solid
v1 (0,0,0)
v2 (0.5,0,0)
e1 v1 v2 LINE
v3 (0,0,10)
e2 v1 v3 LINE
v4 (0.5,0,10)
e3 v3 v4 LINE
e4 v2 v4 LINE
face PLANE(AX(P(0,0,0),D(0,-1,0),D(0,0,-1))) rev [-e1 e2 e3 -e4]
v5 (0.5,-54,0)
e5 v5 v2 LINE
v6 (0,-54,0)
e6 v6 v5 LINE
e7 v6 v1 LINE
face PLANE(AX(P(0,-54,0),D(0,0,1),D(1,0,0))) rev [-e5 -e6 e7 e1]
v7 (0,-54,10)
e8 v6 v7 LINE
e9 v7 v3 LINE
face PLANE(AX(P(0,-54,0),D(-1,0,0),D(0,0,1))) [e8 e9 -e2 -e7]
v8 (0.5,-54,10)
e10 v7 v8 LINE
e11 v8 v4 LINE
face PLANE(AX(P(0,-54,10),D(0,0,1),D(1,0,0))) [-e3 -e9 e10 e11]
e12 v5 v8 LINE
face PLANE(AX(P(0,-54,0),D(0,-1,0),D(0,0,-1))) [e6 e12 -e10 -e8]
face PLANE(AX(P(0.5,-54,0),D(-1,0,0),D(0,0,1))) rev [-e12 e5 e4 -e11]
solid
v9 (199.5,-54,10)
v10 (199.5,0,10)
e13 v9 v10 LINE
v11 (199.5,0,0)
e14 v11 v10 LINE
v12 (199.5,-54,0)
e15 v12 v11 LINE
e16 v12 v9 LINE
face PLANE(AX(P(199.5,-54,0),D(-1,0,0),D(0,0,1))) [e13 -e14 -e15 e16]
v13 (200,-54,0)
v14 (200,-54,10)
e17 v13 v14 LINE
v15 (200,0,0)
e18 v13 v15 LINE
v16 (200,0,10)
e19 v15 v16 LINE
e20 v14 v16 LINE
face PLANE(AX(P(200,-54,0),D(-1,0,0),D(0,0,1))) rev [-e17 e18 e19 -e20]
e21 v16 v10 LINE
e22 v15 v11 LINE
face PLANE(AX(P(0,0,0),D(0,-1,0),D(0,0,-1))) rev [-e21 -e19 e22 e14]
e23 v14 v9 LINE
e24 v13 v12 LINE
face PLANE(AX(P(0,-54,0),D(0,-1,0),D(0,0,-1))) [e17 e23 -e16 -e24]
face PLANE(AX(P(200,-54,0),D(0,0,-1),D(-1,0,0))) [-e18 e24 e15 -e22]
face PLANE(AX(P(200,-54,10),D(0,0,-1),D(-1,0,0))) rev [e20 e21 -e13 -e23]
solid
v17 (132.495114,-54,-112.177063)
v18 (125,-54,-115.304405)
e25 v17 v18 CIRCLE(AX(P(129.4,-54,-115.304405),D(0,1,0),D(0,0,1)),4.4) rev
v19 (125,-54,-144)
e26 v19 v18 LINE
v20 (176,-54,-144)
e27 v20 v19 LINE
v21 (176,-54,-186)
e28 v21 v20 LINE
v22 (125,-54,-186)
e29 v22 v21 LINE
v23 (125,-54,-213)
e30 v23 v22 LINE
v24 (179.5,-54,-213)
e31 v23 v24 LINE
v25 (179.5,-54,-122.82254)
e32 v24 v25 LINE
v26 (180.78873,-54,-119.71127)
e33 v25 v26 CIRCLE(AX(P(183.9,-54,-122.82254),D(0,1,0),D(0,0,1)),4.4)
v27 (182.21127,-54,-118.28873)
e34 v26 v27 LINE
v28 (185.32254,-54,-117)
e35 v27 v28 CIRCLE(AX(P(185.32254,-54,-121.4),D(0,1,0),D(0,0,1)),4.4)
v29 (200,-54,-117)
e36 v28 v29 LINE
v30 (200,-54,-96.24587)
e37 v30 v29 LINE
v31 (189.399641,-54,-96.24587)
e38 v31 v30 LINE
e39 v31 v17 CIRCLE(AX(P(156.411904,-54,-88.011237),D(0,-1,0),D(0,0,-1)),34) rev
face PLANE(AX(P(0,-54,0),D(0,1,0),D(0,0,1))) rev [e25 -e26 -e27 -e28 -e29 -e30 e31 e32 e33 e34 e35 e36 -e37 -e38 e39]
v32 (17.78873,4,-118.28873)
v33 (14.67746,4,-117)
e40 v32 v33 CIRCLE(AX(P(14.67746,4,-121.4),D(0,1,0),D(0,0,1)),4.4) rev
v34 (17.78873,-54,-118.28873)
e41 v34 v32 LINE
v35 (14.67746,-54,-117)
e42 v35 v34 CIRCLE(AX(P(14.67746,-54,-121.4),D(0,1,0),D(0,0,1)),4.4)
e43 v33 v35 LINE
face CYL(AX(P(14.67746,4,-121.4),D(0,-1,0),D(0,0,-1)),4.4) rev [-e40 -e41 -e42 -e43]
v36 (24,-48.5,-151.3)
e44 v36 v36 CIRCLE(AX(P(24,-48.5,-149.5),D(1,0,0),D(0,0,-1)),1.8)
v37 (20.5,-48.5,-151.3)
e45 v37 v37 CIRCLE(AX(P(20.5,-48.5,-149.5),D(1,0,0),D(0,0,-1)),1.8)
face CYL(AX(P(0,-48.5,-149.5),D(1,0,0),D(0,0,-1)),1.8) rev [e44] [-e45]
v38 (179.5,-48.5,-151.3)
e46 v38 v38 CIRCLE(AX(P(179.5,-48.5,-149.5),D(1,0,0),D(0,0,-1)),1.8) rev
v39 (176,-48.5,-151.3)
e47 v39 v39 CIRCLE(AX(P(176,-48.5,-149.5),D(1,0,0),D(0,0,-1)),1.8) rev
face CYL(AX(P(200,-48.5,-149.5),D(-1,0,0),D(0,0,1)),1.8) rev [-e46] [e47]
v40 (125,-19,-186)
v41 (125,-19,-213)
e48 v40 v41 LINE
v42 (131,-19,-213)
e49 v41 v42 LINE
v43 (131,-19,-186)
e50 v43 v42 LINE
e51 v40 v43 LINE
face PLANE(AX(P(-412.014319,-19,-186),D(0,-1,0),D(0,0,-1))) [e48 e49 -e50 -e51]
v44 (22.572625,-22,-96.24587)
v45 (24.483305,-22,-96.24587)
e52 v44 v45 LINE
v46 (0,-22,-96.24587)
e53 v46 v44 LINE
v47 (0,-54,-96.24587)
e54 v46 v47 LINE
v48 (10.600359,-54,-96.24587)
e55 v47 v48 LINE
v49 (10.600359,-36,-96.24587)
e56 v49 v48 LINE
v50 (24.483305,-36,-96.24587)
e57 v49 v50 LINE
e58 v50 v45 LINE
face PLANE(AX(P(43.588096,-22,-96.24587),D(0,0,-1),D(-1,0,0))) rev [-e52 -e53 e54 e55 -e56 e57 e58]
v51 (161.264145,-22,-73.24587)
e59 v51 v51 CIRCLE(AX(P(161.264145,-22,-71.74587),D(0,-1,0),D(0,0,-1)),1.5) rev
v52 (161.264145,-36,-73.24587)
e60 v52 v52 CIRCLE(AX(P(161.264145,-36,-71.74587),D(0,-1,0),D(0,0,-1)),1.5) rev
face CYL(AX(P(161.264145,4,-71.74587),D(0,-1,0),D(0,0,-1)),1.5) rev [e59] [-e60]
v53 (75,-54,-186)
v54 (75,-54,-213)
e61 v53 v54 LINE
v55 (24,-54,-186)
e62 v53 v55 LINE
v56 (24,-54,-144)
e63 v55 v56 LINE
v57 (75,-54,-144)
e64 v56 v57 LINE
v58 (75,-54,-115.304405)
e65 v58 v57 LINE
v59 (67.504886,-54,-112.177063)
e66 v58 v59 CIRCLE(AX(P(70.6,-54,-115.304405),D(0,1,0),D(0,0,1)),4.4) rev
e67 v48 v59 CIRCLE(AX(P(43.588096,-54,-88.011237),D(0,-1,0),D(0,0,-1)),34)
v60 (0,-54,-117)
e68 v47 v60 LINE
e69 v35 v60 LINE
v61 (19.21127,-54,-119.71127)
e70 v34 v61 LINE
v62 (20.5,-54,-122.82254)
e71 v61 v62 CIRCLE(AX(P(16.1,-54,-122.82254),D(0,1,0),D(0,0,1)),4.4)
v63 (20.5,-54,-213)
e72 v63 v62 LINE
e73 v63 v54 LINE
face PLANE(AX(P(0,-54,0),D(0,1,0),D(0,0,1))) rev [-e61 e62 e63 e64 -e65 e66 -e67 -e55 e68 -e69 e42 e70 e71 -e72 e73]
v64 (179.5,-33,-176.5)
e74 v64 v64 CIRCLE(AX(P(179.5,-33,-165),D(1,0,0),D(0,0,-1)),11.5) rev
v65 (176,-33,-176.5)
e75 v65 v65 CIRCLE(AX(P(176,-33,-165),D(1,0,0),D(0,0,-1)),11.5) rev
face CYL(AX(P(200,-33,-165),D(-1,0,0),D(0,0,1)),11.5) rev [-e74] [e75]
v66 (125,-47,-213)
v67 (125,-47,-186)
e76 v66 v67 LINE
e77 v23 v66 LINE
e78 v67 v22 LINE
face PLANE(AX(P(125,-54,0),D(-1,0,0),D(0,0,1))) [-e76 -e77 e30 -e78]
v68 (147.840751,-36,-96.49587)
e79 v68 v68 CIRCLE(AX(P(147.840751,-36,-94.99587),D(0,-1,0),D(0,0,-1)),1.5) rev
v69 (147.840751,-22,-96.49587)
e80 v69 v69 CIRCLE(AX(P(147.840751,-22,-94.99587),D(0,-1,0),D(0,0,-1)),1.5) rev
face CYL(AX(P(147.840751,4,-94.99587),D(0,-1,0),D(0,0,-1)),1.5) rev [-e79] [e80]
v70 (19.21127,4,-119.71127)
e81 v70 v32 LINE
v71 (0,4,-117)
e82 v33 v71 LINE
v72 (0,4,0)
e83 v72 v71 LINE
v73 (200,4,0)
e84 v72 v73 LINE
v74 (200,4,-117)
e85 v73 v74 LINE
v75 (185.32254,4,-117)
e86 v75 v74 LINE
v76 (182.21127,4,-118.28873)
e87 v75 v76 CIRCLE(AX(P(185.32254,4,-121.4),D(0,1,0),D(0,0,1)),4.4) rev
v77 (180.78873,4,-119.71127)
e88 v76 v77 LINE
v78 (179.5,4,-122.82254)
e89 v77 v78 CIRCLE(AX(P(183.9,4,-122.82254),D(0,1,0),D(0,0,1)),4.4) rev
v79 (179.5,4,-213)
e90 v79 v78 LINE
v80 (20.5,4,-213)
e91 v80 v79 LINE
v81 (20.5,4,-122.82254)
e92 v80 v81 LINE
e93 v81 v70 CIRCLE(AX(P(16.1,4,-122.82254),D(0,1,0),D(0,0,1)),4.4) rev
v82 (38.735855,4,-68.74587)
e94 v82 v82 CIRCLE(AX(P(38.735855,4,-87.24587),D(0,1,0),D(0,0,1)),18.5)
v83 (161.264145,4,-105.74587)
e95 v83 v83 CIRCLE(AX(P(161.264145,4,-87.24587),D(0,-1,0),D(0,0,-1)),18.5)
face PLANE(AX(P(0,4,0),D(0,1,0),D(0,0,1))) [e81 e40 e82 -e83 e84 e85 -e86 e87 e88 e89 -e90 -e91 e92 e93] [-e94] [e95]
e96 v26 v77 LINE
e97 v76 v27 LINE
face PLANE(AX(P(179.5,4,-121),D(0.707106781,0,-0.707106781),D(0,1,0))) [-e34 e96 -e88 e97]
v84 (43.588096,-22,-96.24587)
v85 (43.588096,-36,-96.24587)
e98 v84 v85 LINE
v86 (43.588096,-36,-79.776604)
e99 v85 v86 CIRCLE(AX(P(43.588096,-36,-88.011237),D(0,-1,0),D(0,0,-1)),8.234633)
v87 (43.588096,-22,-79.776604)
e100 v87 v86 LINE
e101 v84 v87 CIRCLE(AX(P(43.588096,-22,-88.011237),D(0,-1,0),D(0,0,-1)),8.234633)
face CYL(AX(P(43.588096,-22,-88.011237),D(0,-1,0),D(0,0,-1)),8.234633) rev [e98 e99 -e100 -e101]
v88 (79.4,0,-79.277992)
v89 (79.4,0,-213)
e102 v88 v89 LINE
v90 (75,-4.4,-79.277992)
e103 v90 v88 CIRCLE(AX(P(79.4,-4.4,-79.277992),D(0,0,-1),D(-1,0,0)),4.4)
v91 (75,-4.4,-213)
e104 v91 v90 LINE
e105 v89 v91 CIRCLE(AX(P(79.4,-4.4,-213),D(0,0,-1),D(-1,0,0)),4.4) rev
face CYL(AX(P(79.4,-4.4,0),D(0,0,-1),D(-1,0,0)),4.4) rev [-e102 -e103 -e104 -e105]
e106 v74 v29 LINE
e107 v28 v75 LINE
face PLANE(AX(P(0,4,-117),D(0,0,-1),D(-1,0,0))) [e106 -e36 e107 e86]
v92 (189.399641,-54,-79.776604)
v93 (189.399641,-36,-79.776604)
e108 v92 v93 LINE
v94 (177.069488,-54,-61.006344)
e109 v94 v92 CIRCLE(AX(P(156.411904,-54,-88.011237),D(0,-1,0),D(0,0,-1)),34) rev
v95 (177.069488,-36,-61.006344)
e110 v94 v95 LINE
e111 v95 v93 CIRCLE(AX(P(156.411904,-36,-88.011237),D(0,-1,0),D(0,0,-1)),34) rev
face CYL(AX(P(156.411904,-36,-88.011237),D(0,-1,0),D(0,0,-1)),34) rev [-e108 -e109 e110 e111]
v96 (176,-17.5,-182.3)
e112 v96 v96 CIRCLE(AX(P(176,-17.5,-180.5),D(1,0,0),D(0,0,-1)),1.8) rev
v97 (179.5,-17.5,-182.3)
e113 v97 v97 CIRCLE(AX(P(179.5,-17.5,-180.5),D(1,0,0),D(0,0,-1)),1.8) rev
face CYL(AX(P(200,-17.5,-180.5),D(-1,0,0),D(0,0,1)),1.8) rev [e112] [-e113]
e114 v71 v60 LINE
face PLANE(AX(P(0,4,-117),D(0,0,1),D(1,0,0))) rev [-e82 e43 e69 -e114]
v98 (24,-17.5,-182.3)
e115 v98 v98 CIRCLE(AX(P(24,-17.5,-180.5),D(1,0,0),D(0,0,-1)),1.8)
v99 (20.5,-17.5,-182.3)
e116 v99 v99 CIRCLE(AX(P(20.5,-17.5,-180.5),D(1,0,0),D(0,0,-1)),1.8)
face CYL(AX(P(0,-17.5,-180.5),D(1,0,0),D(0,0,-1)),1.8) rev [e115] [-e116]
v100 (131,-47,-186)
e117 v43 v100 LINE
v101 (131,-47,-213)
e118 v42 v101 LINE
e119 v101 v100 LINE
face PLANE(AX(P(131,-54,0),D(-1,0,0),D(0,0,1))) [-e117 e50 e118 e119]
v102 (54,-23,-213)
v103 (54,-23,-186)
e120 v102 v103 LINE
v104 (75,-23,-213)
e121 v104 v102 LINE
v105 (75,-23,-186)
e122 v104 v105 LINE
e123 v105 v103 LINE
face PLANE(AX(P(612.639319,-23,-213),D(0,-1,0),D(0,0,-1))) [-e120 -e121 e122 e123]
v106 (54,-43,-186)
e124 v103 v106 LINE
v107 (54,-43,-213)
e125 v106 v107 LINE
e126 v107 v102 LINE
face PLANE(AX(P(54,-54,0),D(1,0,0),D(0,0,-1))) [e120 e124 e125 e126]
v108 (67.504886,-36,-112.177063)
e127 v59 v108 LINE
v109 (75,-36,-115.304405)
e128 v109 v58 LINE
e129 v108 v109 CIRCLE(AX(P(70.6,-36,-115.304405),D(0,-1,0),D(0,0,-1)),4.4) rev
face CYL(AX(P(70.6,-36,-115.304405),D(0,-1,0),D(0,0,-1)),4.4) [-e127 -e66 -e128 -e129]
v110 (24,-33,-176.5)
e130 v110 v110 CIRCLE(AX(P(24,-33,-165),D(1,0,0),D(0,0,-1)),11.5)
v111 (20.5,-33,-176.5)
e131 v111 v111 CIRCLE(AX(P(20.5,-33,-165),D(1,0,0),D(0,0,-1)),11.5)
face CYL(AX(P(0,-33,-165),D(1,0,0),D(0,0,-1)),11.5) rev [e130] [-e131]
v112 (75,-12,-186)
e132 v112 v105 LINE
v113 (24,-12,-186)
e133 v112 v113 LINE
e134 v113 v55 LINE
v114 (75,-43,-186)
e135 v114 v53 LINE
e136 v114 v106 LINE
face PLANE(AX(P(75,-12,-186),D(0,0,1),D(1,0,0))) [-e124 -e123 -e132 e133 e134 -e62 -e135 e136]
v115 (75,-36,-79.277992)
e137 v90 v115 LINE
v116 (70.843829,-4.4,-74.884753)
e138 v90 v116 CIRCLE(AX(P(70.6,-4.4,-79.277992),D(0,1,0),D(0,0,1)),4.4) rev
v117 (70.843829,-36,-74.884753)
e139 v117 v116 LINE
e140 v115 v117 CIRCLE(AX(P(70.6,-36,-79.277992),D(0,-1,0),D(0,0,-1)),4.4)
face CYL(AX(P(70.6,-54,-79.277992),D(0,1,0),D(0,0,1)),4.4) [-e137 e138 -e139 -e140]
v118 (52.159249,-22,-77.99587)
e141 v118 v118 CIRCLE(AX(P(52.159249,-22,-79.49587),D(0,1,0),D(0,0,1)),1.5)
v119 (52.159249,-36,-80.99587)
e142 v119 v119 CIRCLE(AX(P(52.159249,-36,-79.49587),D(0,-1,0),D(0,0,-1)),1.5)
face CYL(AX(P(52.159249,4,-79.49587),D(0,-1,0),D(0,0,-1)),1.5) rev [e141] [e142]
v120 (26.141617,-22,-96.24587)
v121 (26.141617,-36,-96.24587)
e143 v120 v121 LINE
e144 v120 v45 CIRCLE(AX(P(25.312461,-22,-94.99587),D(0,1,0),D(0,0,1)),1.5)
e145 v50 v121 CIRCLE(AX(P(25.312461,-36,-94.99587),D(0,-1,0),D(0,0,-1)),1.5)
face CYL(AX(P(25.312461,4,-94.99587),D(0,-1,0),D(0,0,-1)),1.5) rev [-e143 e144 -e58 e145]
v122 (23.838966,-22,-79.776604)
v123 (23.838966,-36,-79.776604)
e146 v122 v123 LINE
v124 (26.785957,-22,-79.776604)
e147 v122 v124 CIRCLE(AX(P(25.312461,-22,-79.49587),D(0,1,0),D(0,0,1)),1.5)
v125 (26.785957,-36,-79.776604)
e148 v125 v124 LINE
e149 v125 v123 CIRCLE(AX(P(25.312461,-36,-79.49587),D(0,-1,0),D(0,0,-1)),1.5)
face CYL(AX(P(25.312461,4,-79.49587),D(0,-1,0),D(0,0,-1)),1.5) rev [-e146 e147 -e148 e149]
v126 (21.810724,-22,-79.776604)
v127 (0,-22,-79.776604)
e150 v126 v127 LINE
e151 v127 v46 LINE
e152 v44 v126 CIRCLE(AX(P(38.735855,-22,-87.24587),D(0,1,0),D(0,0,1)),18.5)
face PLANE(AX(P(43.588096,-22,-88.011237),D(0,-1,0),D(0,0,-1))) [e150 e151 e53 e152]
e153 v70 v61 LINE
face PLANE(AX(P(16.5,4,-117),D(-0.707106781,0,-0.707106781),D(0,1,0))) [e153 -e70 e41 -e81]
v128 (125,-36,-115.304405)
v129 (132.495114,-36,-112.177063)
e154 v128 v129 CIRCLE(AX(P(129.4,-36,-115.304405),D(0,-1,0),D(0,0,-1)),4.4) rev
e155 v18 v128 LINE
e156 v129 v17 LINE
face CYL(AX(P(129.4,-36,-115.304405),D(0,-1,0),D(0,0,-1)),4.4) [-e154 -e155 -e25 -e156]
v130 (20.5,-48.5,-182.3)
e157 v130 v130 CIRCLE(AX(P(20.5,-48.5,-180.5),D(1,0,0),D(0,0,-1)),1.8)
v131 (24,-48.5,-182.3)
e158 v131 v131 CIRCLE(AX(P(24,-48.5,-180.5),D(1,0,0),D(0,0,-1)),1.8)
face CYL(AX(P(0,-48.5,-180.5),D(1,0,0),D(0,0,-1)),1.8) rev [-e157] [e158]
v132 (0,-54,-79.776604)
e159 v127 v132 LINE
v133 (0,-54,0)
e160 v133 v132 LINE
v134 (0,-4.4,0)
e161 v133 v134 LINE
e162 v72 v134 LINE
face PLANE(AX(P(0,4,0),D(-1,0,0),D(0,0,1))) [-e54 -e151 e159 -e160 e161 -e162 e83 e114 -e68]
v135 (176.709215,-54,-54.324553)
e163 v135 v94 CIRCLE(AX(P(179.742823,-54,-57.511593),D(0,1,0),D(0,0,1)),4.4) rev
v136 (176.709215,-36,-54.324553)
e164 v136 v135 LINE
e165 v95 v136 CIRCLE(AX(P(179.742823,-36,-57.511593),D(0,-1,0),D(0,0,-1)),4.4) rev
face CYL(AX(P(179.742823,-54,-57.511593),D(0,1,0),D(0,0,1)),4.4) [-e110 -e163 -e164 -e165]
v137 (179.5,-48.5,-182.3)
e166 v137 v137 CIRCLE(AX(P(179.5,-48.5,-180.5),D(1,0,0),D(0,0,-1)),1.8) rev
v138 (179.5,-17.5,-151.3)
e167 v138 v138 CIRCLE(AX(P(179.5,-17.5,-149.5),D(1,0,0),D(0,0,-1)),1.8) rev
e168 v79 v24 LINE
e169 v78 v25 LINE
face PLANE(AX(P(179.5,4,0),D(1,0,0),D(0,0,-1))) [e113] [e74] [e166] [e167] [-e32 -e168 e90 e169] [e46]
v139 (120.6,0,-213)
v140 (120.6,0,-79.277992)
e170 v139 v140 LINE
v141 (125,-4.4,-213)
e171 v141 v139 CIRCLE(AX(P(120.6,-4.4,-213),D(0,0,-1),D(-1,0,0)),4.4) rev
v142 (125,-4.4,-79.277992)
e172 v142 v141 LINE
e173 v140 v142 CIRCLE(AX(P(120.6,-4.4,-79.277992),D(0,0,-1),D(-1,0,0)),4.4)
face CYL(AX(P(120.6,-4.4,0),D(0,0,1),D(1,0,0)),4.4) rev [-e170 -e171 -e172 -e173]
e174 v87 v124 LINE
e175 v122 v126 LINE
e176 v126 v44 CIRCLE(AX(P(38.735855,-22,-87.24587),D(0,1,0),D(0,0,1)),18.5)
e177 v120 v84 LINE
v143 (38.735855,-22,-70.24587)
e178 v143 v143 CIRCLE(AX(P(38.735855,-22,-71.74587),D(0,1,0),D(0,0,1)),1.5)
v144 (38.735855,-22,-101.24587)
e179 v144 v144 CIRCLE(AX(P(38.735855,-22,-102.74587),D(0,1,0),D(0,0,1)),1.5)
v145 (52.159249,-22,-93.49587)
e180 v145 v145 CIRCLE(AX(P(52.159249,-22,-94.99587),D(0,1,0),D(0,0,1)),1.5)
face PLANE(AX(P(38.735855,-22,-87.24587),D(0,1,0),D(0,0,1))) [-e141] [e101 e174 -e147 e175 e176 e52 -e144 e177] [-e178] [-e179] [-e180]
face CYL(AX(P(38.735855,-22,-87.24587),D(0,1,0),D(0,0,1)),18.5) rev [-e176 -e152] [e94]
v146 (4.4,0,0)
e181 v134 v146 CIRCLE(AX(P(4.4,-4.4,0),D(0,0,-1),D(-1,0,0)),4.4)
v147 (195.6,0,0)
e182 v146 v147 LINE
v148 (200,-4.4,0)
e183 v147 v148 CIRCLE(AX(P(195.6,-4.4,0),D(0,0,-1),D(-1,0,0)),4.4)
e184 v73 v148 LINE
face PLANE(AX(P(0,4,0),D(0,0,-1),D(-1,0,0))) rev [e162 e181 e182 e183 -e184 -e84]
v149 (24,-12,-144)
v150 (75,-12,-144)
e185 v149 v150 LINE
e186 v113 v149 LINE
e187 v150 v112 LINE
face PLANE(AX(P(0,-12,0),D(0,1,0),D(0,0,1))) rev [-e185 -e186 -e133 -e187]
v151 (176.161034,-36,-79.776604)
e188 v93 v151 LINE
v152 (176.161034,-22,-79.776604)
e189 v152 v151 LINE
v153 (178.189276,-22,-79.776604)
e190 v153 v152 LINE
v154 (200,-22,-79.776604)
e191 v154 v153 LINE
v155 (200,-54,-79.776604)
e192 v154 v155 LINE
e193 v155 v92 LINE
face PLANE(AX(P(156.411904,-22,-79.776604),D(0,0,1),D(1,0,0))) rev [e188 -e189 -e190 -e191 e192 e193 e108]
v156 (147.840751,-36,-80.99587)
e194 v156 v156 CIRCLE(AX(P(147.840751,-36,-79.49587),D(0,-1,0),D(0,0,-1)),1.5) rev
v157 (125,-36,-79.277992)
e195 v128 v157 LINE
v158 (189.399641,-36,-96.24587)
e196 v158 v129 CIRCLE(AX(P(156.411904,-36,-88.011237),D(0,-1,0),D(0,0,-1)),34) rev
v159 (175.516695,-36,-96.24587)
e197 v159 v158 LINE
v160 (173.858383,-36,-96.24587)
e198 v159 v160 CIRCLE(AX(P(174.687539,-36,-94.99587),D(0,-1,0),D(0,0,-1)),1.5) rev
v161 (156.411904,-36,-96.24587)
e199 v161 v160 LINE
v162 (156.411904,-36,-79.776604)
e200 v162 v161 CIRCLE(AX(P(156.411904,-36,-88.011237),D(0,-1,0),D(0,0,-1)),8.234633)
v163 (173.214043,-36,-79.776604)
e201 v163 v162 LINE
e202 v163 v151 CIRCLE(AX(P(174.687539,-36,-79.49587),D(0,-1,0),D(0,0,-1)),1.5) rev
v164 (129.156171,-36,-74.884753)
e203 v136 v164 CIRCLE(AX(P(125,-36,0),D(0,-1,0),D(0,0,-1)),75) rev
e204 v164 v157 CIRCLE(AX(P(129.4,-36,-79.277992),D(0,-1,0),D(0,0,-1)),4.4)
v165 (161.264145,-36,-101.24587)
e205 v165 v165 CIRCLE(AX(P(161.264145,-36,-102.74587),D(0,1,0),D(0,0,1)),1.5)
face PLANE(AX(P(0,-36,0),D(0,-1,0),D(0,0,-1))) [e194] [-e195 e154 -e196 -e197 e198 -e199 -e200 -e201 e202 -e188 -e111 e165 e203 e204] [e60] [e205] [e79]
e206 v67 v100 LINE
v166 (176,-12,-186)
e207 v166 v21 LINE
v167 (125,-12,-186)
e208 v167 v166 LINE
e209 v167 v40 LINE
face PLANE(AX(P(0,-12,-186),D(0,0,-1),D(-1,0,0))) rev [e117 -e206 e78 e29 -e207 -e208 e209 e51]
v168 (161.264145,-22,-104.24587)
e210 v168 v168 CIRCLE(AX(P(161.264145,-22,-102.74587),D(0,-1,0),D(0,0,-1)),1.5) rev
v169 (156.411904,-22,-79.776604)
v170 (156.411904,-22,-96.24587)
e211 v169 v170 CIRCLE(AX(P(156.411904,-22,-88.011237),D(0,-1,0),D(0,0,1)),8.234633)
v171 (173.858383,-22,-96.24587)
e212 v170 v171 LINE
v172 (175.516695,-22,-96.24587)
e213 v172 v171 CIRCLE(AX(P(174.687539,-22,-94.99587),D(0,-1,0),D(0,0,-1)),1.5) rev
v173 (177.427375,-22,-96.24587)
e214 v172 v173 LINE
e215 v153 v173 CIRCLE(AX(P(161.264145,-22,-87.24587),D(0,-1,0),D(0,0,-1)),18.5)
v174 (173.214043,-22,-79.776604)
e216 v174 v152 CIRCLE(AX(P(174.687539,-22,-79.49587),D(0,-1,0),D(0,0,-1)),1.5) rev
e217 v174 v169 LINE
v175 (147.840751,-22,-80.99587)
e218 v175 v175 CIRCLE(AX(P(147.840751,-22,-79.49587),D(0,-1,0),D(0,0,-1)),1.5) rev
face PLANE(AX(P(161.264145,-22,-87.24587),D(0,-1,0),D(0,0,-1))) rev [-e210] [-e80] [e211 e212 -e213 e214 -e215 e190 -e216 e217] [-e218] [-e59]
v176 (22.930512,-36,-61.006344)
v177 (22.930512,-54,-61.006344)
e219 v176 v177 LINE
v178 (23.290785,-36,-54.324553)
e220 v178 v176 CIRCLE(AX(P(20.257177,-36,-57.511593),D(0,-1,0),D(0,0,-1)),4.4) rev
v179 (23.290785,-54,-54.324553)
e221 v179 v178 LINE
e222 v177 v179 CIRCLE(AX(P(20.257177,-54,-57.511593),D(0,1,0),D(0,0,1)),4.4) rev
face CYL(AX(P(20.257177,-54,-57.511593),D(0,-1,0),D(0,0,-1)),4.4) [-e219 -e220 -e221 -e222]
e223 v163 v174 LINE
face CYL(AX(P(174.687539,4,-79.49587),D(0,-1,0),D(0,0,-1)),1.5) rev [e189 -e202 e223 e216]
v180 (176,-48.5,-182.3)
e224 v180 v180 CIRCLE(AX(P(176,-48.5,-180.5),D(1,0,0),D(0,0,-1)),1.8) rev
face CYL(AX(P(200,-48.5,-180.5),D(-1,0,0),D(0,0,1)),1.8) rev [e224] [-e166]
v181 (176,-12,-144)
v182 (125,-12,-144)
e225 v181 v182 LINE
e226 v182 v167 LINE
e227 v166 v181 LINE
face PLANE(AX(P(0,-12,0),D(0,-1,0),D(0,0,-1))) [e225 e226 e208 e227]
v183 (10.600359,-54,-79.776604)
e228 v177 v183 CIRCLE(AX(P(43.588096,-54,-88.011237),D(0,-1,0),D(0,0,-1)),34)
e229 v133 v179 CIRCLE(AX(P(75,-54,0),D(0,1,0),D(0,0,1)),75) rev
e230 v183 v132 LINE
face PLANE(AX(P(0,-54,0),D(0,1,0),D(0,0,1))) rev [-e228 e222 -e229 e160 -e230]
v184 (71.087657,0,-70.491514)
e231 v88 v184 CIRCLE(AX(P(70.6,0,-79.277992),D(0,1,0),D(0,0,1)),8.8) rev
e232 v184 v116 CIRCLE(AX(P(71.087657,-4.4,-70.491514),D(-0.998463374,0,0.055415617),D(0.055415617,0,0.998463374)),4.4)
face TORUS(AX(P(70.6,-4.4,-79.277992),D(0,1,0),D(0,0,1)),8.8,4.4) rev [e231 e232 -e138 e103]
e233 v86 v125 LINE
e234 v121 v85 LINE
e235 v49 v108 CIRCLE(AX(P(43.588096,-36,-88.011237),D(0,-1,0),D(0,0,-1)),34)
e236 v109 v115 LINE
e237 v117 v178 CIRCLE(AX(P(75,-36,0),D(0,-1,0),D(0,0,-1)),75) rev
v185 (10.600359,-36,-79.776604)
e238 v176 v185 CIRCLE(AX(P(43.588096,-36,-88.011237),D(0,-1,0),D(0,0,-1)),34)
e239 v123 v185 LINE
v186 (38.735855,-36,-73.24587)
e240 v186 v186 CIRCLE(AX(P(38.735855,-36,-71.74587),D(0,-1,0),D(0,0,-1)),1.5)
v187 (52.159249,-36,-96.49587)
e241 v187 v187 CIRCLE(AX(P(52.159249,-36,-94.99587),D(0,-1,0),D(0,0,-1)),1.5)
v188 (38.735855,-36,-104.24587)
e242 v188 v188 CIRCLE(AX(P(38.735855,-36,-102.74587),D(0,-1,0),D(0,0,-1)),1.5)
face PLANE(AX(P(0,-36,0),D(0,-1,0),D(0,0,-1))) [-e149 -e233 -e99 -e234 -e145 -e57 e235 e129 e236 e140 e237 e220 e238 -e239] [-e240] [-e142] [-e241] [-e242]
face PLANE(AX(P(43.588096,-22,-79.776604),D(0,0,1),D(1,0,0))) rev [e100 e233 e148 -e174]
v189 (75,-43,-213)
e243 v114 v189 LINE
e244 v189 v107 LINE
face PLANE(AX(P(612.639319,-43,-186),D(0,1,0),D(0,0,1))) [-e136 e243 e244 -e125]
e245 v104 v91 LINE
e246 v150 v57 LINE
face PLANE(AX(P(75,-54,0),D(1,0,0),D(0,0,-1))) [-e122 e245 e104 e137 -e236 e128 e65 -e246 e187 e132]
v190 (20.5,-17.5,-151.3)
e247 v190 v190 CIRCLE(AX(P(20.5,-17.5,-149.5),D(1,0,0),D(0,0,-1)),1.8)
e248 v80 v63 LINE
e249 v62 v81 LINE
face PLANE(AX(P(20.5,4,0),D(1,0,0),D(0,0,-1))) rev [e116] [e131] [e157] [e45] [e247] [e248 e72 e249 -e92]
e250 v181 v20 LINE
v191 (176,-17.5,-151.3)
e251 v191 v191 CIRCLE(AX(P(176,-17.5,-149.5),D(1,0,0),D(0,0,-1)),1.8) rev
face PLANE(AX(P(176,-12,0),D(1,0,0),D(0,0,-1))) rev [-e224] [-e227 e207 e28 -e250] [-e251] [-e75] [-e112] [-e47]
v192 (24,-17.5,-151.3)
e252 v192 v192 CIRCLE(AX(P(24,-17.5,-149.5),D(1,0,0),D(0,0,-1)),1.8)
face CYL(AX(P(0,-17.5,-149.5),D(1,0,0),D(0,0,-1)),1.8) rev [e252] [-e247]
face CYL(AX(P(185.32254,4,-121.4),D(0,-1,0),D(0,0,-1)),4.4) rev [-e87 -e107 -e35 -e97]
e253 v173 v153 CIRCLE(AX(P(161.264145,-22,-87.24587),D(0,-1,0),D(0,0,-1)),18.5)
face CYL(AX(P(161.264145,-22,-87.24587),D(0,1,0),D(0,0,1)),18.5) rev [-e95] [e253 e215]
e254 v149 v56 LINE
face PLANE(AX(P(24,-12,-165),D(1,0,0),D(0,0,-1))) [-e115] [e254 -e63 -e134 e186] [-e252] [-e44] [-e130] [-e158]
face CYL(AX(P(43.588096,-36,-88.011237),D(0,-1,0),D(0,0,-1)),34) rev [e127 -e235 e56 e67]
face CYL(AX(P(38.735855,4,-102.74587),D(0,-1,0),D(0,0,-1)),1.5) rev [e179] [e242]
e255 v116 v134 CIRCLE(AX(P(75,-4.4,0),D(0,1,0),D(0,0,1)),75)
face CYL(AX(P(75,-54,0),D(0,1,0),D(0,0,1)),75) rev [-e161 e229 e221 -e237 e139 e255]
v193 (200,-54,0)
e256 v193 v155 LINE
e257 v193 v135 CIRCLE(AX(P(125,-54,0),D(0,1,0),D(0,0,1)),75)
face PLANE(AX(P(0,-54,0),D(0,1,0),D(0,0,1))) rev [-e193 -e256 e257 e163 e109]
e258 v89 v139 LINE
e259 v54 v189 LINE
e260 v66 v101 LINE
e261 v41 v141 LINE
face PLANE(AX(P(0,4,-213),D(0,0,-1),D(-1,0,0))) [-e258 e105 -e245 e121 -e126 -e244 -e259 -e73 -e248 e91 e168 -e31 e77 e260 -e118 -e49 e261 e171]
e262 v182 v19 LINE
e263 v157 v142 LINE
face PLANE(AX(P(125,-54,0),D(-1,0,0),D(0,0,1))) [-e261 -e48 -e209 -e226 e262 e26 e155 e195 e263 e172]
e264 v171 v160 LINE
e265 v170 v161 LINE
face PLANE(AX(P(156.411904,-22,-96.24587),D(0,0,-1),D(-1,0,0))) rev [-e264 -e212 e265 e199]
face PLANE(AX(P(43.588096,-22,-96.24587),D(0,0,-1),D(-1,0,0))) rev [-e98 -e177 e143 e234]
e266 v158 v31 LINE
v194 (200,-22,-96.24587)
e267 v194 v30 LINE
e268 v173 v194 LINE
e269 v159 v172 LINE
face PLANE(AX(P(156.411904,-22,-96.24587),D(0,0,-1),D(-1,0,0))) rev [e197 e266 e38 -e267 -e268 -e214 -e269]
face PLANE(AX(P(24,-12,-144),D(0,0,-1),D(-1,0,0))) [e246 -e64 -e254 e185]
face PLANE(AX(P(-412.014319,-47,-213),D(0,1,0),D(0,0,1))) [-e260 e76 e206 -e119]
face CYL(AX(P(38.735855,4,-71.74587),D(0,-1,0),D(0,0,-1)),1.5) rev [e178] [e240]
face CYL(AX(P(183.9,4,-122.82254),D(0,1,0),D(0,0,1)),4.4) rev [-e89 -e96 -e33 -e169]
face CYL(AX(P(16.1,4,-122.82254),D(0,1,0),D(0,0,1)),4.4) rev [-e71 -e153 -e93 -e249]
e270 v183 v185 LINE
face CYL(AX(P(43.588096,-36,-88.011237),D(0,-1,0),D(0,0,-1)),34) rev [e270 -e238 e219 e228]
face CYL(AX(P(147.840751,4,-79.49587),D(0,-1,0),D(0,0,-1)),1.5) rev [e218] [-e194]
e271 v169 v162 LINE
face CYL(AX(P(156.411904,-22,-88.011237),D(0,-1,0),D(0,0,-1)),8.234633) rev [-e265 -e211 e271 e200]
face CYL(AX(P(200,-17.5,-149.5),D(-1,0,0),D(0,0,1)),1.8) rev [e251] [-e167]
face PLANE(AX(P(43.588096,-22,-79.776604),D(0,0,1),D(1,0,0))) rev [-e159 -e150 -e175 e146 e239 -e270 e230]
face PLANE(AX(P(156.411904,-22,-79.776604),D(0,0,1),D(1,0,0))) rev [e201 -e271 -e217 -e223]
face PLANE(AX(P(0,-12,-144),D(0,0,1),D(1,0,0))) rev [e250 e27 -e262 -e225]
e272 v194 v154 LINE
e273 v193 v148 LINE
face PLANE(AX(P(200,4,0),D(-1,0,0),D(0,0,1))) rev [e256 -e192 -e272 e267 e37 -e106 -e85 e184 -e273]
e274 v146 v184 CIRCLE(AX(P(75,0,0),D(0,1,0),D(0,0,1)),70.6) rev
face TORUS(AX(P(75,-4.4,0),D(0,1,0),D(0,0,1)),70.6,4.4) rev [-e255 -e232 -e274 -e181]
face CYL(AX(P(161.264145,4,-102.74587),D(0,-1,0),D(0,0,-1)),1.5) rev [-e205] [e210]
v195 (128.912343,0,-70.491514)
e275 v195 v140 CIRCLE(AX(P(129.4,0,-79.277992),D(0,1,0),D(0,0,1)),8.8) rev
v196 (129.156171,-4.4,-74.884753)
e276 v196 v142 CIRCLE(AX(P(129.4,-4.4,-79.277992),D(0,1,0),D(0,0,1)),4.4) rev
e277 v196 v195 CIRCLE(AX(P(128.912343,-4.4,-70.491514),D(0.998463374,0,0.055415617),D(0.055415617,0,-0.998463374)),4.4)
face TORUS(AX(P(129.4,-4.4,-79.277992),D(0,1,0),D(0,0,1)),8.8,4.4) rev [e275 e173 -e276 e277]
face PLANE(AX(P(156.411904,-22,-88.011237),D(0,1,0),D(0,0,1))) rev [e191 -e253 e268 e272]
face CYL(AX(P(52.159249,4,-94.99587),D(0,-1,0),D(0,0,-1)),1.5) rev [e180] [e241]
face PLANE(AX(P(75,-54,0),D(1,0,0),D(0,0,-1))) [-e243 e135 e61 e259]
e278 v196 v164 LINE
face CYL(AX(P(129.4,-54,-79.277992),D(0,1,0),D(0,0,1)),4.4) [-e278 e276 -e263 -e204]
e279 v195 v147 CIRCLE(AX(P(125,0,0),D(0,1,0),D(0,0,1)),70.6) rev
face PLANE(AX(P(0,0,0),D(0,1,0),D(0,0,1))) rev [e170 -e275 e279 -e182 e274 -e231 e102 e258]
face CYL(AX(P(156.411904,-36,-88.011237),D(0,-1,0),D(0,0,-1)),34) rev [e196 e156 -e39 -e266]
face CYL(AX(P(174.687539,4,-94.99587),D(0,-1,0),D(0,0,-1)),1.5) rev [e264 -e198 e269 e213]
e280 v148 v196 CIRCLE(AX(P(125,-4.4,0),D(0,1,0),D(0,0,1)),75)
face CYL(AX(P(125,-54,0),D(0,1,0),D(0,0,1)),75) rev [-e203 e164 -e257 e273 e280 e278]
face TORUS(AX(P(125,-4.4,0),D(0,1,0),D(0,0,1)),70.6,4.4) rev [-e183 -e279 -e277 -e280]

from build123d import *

# Parameters (mm, degrees)
SKETCH_1_W              = 200
SKETCH_1_H              = 213
EXTRUDE_1_DEPTH         = 4
EXTRUDE_2_DEPTH         = 54
SKETCH_1_5_W            = 0.5
SKETCH_1_5_H            = 10
EXTRUDE_3_DEPTH         = 54
EXTRUDE_3_2_DEPTH       = 54
CUT_EXTRUDE_2_DEPTH     = 298.880848663
CUT_EXTRUDE_3_DEPTH     = 42
SKETCH_7_R              = 1.8
SKETCH_7_R_2            = 11.5
CUT_EXTRUDE_4_DEPTH     = 282.53330176
MIRROR_START            = 176
MIRROR_1_OUTLINE_R      = 1.8
MIRROR_1_OUTLINE_R_2    = 11.5
MIRROR_1_DEPTH          = 3.5
CUT_EXTRUDE_START       = -21
CUT_EXTRUDE_5_OUTLINE_W = 27
CUT_EXTRUDE_5_OUTLINE_H = 20
CUT_EXTRUDE_5_DEPTH     = 21
CUT_EXTRUDE_START_2     = -6
CUT_EXTRUDE_6_OUTLINE_W = 27
CUT_EXTRUDE_6_OUTLINE_H = 28
CUT_EXTRUDE_6_DEPTH     = 6
SKETCH_11_R             = 34
CUT_EXTRUDE_7_DEPTH     = 18
CUT_EXTRUDE_8_DEPTH     = 32
SKETCH_15_R             = 18.5
CUT_EXTRUDE_11_DEPTH    = 26
SKETCH_17_R             = 1.5
CUT_EXTRUDE_14_DEPTH    = 295.905069472
CHAMFER_1_SIZE          = 4
FILLET_3_R              = 4.4


# Read off the part's stored shape, not the designer's step: 镜向1, 切除-拉伸5, 切除-拉伸6
with BuildPart() as part:
    # 草图1 → 凸台-拉伸1 (new body)
    with BuildSketch(Plane(origin=(0, 0, 0), x_dir=(1, 0, 0), z_dir=(0, 1, 0))):
        with Locations((100, 106.5)):
            Rectangle(SKETCH_1_W, SKETCH_1_H)
    extrude(amount=EXTRUDE_1_DEPTH)

    # 草图1<4> → 凸台-拉伸2 (add)
    with BuildSketch(Plane(origin=(0, 0, 0), x_dir=(1, 0, 0), z_dir=(0, 1, 0))):
        with BuildLine():
            Line((0, 213), (0, 0))
            ThreePointArc((0, 0), (21.966991411, 53.033008589), (75, 75))
            Line((75, 75), (75, 213))
            Line((75, 213), (0, 213))
        make_face()
        with BuildLine():
            Line((125, 213), (125, 75))
            ThreePointArc((125, 75), (178.033008589, 53.033008589), (200, 0))
            Line((200, 0), (200, 213))
            Line((200, 213), (125, 213))
        make_face()
    extrude(amount=-EXTRUDE_2_DEPTH)

    # 草图3 → 切除-拉伸2 (cut, through all)
    with BuildSketch(Plane.XZ.offset(54)):
        Polygon((20.5, -186), (20.5, -165), (20.5, -144), (20.5, -117), (0, -117), (0, -213), (20.5, -213), align=None)
        Polygon((179.5, -117), (200, -117), (200, -213), (179.5, -213), (179.5, -165), align=None)
    extrude(amount=-CUT_EXTRUDE_2_DEPTH, mode=Mode.SUBTRACT)

    # 草图5 → 切除-拉伸3 (cut)
    with BuildSketch(Plane.XZ.offset(54)):
        Polygon((176, -165), (176, -144), (125, -144), (125, -186), (176, -186), align=None)
        Polygon((24, -165), (24, -144), (75, -144), (75, -186), (24, -186), align=None)
    extrude(amount=-CUT_EXTRUDE_3_DEPTH, mode=Mode.SUBTRACT)

    # 草图7 → 切除-拉伸4 (cut, through all)
    with BuildSketch(Plane(origin=(24, 0, 0), x_dir=(0, 0, -1), z_dir=(1, 0, 0))):
        with Locations((180.5, -17.5)):
            Circle(SKETCH_7_R)
        with Locations((149.5, -17.5)):
            Circle(SKETCH_7_R)
        with Locations((165, -33)):
            Circle(SKETCH_7_R_2)
        with Locations((180.5, -48.5)):
            Circle(SKETCH_7_R)
        with Locations((149.5, -48.5)):
            Circle(SKETCH_7_R)
    extrude(amount=-CUT_EXTRUDE_4_DEPTH, mode=Mode.SUBTRACT)

    # 镜向1 outline → 镜向1 (cut)
    with BuildSketch(Plane.YZ.offset(MIRROR_START)):
        with Locations((-17.5, -180.5)):
            Circle(MIRROR_1_OUTLINE_R)
        with Locations((-17.5, -149.5)):
            Circle(MIRROR_1_OUTLINE_R)
        with Locations((-33, -165)):
            Circle(MIRROR_1_OUTLINE_R_2)
        with Locations((-48.5, -180.5)):
            Circle(MIRROR_1_OUTLINE_R)
        with Locations((-48.5, -149.5)):
            Circle(MIRROR_1_OUTLINE_R)
    extrude(amount=MIRROR_1_DEPTH, mode=Mode.SUBTRACT)

    # 切除-拉伸5 outline → 切除-拉伸5 (cut)
    with BuildSketch(Plane(origin=(75, 0, 0), x_dir=(0, 0, -1), z_dir=(1, 0, 0)).offset(CUT_EXTRUDE_START)):
        with Locations((199.5, -33)):
            Rectangle(CUT_EXTRUDE_5_OUTLINE_W, CUT_EXTRUDE_5_OUTLINE_H)
    extrude(amount=CUT_EXTRUDE_5_DEPTH, mode=Mode.SUBTRACT)

    # 切除-拉伸6 outline → 切除-拉伸6 (cut)
    with BuildSketch(Plane.ZY.offset(-125).offset(CUT_EXTRUDE_START_2)):
        with Locations((-199.5, -33)):
            Rectangle(CUT_EXTRUDE_6_OUTLINE_W, CUT_EXTRUDE_6_OUTLINE_H)
    extrude(amount=CUT_EXTRUDE_6_DEPTH, mode=Mode.SUBTRACT)

    # 草图11 → 切除-拉伸7 (cut)
    with BuildSketch(Plane.XZ.offset(54)):
        with Locations((43.588095895, -88.0112367)):
            Circle(SKETCH_11_R)
        with Locations((156.411904105, -88.0112367)):
            Circle(SKETCH_11_R)
    extrude(amount=-CUT_EXTRUDE_7_DEPTH, mode=Mode.SUBTRACT)

    # 草图12 → 切除-拉伸8 (cut)
    with BuildSketch(Plane.XZ.offset(54)):
        with BuildLine():
            Line((43.588095895, -79.776603565), (0, -79.776603565))
            Line((0, -79.776603565), (0, -96.245869836))
            Line((0, -96.245869836), (43.588095895, -96.245869836))
            ThreePointArc((43.588095895, -96.245869836), (51.82272903, -88.0112367), (43.588095895, -79.776603565))
        make_face()
        with BuildLine():
            Line((200, -79.776603565), (200, -96.245869836))
            Line((200, -96.245869836), (156.411904105, -96.245869836))
            ThreePointArc((156.411904105, -96.245869836), (148.17727097, -88.0112367), (156.411904105, -79.776603565))
            Line((156.411904105, -79.776603565), (200, -79.776603565))
        make_face()
    extrude(amount=-CUT_EXTRUDE_8_DEPTH, mode=Mode.SUBTRACT)

    # 草图15 → 切除-拉伸11 (cut)
    with BuildSketch(Plane(origin=(0, 4, 0), x_dir=(1, 0, 0), z_dir=(0, 1, 0))):
        with Locations(Location((38.73585496, 87.245869836, 0), (0, 0, 270))):
            Circle(SKETCH_15_R)
        with Locations(Location((161.26414504, 87.245869836, 0), (0, 0, 336.187548677))):
            Circle(SKETCH_15_R)
    extrude(amount=-CUT_EXTRUDE_11_DEPTH, mode=Mode.SUBTRACT)

    # 草图17 → 切除-拉伸14 (cut, through all)
    with BuildSketch(Plane.XZ.offset(36)):
        with Locations((25.312461201, -79.495869836)):
            Circle(SKETCH_17_R)
        with Locations(Location((38.73585496, -71.745869836, 0), (0, 0, 270))):
            Circle(SKETCH_17_R)
        with Locations(Location((52.159248718, -79.495869836, 0), (0, 0, 270))):
            Circle(SKETCH_17_R)
        with Locations(Location((52.159248718, -94.995869836, 0), (0, 0, 270))):
            Circle(SKETCH_17_R)
        with Locations(Location((38.73585496, -102.745869836, 0), (0, 0, 270))):
            Circle(SKETCH_17_R)
        with Locations((25.312461201, -94.995869836)):
            Circle(SKETCH_17_R)
        with Locations((174.687538799, -94.995869836)):
            Circle(SKETCH_17_R)
        with Locations(Location((161.26414504, -102.745869836, 0), (0, 0, 270))):
            Circle(SKETCH_17_R)
        with Locations(Location((147.840751282, -94.995869836, 0), (0, 0, 270))):
            Circle(SKETCH_17_R)
        with Locations(Location((147.840751282, -79.495869836, 0), (0, 0, 270))):
            Circle(SKETCH_17_R)
        with Locations(Location((161.26414504, -71.745869836, 0), (0, 0, 270))):
            Circle(SKETCH_17_R)
        with Locations((174.687538799, -79.495869836)):
            Circle(SKETCH_17_R)
    extrude(amount=-CUT_EXTRUDE_14_DEPTH, mode=Mode.SUBTRACT)

    # 倒角1
    chamfer_1_edges = [part.edges().sort_by_distance(p)[0] for p in [
        (20.5, -25, -117),
        (179.5, -25, -117),
    ]]
    chamfer(chamfer_1_edges, length=CHAMFER_1_SIZE)

    # 圆角3
    fillet_3_edges = [part.edges().sort_by_distance(p)[0] for p in [
        (125, -18, -75),
        (125, -45, -101.022473401),
        (75, -18, -75),
        (27.512880617, -45, -58.051472787),
        (75, -45, -101.022473401),
        (172.487119383, -45, -58.051472787),
        (21.966991411, 0, -53.033008589),
        (75, 0, -144),
        (178.033008589, 0, -53.033008589),
        (125, 0, -144),
        (16.5, -25, -117),
        (20.5, -25, -121),
        (179.5, -25, -121),
        (183.5, -25, -117),
    ]]
    fillet(fillet_3_edges, radius=FILLET_3_R)


with BuildPart() as body_2:
    # 草图1<5> → 凸台-拉伸3 (new body)
    with BuildSketch(Plane(origin=(0, 0, 0), x_dir=(1, 0, 0), z_dir=(0, 1, 0))):
        with Locations((199.75, -5)):
            Rectangle(SKETCH_1_5_W, SKETCH_1_5_H)
    extrude(amount=-EXTRUDE_3_DEPTH)


with BuildPart() as body_3:
    # 草图1<5> → Extrude 3 2 (new body)
    with BuildSketch(Plane(origin=(0, 0, 0), x_dir=(1, 0, 0), z_dir=(0, 1, 0))):
        with Locations((0.25, -5)):
            Rectangle(SKETCH_1_5_W, SKETCH_1_5_H)
    extrude(amount=-EXTRUDE_3_2_DEPTH)


solid = Compound([part.part, body_2.part, body_3.part])
